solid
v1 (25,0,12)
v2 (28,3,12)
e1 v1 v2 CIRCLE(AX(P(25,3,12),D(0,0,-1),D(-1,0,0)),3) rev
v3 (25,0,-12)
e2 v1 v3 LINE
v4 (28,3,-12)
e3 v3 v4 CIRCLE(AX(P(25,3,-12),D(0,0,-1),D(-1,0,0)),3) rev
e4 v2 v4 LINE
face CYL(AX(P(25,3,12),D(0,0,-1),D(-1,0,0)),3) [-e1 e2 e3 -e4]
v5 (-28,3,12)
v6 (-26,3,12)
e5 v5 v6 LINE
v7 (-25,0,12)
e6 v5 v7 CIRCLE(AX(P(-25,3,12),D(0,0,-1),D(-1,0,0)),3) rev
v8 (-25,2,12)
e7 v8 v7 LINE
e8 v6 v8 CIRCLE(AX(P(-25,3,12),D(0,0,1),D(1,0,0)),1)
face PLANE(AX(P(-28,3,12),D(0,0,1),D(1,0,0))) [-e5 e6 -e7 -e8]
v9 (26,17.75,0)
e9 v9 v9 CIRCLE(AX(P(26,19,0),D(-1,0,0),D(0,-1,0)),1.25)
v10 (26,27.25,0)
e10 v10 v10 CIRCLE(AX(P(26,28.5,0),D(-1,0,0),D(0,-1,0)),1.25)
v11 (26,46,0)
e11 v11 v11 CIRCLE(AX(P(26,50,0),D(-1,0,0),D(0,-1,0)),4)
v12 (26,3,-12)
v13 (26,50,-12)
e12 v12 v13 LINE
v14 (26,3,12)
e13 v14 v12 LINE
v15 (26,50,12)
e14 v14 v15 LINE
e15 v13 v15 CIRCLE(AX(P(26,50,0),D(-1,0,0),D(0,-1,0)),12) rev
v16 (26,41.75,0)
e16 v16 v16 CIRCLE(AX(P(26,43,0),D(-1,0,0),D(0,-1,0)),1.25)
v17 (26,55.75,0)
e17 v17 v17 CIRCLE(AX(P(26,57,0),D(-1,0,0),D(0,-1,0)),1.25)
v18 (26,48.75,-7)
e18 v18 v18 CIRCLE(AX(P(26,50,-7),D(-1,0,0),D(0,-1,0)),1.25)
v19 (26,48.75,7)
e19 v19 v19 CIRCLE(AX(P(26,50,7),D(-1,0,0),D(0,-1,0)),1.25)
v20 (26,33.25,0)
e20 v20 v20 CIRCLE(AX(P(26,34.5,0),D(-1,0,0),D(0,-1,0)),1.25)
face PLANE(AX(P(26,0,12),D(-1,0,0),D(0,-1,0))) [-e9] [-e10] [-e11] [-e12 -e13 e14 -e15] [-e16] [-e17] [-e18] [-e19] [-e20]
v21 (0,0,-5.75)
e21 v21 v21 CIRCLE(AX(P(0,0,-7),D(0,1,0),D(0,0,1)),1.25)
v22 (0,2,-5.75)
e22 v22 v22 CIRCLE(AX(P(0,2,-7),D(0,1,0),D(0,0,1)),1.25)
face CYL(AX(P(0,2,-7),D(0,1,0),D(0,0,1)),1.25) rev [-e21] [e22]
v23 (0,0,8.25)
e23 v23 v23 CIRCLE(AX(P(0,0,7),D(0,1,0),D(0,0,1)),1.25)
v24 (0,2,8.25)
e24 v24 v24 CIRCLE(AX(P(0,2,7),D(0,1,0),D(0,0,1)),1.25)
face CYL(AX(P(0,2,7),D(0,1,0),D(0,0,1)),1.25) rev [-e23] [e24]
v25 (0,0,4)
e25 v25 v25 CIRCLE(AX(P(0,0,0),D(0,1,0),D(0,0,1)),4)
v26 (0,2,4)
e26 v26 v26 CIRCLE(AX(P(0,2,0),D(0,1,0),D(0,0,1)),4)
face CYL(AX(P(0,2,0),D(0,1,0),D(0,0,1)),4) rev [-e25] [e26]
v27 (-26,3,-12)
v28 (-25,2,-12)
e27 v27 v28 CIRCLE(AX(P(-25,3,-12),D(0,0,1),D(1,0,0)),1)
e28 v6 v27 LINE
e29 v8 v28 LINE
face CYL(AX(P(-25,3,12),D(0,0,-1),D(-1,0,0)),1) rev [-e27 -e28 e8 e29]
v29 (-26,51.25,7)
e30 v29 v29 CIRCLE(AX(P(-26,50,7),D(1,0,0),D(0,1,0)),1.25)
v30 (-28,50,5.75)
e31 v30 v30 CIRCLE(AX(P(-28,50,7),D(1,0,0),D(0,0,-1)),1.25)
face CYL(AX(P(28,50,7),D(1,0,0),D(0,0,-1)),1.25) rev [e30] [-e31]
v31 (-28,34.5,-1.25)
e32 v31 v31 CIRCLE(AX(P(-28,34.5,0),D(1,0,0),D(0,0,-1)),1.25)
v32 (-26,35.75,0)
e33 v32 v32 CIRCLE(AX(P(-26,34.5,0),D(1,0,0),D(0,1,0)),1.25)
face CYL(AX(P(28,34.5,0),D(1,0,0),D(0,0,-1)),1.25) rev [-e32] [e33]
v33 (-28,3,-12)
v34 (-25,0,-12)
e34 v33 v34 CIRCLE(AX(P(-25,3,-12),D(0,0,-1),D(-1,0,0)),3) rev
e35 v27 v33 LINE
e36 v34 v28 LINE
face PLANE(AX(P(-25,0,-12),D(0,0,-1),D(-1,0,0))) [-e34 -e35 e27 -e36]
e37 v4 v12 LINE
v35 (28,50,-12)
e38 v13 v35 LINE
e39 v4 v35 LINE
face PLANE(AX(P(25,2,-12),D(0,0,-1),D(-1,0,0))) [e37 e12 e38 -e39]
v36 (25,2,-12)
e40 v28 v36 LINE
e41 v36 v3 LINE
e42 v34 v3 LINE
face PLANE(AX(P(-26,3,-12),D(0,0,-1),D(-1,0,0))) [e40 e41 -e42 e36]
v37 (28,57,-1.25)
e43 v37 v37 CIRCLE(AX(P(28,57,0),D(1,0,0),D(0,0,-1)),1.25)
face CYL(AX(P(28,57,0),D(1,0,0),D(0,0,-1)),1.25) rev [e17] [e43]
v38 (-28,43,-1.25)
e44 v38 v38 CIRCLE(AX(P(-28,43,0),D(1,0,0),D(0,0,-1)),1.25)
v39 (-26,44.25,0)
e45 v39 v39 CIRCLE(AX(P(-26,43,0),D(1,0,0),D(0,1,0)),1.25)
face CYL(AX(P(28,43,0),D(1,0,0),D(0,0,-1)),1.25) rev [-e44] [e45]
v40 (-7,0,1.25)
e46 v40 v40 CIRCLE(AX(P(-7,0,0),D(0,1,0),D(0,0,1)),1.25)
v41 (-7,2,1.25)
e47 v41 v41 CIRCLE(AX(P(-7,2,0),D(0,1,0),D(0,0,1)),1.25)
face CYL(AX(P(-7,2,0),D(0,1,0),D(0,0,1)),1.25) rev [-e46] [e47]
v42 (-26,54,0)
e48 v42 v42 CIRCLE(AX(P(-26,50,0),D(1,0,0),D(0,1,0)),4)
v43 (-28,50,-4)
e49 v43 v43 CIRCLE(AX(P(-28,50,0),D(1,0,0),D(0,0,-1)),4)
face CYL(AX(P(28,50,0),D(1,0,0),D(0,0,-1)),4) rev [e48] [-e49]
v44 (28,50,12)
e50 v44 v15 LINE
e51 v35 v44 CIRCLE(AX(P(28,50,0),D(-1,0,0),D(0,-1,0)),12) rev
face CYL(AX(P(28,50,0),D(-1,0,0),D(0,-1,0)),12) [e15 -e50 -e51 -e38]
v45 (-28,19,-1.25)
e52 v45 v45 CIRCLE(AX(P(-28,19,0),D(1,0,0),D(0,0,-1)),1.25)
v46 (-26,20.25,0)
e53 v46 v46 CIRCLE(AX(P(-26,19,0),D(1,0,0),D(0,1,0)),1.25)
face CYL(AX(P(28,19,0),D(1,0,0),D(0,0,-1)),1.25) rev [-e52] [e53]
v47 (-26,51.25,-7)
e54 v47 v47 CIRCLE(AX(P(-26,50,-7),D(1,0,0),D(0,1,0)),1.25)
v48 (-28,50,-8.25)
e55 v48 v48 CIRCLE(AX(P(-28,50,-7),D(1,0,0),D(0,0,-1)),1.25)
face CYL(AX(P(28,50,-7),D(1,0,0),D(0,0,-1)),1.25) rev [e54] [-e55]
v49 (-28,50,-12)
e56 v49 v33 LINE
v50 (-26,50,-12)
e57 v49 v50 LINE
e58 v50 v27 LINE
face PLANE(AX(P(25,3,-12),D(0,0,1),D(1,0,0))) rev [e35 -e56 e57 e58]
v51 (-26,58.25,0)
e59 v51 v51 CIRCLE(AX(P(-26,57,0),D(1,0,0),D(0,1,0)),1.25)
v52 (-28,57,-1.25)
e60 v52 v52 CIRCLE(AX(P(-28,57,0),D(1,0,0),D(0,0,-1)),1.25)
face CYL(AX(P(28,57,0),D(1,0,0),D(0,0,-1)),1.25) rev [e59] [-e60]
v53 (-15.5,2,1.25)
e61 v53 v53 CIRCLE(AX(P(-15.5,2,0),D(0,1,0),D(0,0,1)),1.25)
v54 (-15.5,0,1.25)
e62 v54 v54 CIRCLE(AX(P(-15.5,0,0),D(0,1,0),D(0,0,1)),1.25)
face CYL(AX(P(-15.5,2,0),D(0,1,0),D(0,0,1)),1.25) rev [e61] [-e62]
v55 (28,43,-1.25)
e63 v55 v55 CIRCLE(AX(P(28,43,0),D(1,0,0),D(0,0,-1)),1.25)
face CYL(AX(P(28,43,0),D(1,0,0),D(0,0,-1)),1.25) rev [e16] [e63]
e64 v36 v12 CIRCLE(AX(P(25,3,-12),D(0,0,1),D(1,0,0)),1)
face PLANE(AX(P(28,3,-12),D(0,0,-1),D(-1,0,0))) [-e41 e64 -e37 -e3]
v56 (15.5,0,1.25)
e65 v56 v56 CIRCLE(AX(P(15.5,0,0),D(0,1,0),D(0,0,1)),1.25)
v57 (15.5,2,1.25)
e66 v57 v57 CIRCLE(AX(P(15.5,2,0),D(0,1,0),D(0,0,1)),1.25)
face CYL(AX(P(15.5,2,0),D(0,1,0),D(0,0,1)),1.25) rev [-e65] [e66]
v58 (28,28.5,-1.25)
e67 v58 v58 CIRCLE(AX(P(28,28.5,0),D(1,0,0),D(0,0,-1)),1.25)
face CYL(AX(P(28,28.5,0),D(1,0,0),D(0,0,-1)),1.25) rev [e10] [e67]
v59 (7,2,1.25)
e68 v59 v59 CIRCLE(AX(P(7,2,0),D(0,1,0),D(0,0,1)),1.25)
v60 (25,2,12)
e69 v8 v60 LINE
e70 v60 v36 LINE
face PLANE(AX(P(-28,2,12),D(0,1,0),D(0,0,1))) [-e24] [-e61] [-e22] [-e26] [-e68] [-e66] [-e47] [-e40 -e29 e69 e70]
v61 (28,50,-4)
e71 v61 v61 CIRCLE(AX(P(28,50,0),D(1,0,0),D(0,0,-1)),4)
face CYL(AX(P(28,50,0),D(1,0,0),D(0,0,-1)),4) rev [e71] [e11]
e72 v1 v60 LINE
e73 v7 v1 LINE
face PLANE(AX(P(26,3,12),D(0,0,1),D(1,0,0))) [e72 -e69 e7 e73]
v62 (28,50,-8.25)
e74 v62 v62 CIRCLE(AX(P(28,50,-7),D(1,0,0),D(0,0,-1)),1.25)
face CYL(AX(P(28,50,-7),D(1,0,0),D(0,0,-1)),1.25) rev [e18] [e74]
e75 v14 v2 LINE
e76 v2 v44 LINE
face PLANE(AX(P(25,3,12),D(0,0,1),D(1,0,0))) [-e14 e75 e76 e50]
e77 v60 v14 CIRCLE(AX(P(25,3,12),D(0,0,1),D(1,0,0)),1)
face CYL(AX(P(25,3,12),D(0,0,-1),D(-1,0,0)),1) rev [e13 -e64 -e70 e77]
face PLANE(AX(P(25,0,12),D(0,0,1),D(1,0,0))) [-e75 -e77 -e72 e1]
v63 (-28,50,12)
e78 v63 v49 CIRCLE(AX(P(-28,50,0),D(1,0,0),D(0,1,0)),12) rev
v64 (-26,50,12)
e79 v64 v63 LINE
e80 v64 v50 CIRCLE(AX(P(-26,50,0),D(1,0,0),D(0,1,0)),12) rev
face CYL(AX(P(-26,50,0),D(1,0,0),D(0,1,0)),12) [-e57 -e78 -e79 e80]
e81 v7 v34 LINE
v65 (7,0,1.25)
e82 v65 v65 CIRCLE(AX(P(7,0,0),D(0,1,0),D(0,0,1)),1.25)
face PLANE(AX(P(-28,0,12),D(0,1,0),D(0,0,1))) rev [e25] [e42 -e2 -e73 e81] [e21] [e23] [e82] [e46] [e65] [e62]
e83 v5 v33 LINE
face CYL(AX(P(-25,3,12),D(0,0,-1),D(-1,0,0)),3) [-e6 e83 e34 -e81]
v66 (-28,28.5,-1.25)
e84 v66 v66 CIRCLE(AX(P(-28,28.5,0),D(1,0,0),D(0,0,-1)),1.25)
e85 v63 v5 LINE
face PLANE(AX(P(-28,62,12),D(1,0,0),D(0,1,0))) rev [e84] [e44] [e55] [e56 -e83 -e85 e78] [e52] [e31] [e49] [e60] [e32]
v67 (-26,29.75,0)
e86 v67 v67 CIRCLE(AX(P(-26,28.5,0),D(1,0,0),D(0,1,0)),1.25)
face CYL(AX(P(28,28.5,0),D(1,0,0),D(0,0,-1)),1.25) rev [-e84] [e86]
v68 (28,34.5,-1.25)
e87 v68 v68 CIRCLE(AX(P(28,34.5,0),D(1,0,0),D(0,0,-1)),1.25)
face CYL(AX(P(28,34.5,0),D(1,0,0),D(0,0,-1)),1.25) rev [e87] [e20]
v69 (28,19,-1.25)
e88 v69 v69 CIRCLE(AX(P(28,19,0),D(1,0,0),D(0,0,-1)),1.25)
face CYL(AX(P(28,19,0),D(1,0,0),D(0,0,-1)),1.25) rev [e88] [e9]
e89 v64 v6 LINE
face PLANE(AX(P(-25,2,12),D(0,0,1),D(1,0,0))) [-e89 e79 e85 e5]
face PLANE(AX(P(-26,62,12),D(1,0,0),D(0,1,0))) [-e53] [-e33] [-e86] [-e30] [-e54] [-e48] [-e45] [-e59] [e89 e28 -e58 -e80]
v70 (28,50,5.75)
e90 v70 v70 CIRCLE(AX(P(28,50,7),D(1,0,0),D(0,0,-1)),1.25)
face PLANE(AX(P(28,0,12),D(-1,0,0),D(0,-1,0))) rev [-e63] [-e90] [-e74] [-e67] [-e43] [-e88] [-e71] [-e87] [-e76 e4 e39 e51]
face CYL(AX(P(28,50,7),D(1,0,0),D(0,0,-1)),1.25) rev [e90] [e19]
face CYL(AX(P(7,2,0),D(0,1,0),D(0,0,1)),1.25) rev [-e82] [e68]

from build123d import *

# Parameters (mm, degrees)
T_LE_DE_BASE_PLI_E1_DEPTH       = 12
ENL_V_START                     = -56
ENL_V_MAT_EXTRU_1_DEPTH         = 56
DIAM_TRE_DU_PER_AGE_8_0_8_1_D   = 8
DIAM_TRE_DU_PER_AGE_2_5_2_5_1_D = 2.5
DIAM_TRE_DU_PER_AGE_8_0_8_2_D   = 8
DIAM_TRE_DU_PER_AGE_2_5_2_5_2_D = 2.5


# Read off the part's stored shape, not the designer's step: Enlèv. mat.-Extru.1
# Sheet-metal steps are written as plain solids
with BuildPart() as part:
    # Esquisse1 → Tôle de base pliée1 (new, symmetric)
    with BuildSketch(Plane.XY):
        with BuildLine():
            Line((-28, 62), (-28, 3))
            ThreePointArc((-28, 3), (-27.121320344, 0.878679656), (-25, 0))
            Line((-25, 0), (25, 0))
            ThreePointArc((25, 0), (27.121320344, 0.878679656), (28, 3))
            Line((28, 3), (28, 62))
            Line((28, 62), (26, 62))
            Line((26, 62), (26, 3))
            ThreePointArc((26, 3), (25.707106781, 2.292893219), (25, 2))
            Line((25, 2), (-25, 2))
            ThreePointArc((-25, 2), (-25.707106781, 2.292893219), (-26, 3))
            Line((-26, 3), (-26, 62))
            Line((-26, 62), (-28, 62))
        make_face()
    extrude(amount=T_LE_DE_BASE_PLI_E1_DEPTH, both=True)

    # Enlèv. mat.-Extru.1 outline → Enlèv. mat.-Extru.1 (cut)
    with BuildSketch(Plane(origin=(28, 0, 0), x_dir=(0, 0, -1), z_dir=(1, 0, 0)).offset(ENL_V_START)):
        with BuildLine():
            ThreePointArc((-12, 50), (-8.485281374, 58.485281374), (0, 62))
            Line((0, 62), (-12, 62))
            Line((-12, 62), (-12, 50))
        make_face()
        with BuildLine():
            ThreePointArc((0, 62), (8.485281374, 58.485281374), (12, 50))
            Line((12, 50), (12, 62))
            Line((12, 62), (0, 62))
        make_face()
    extrude(amount=ENL_V_MAT_EXTRU_1_DEPTH, mode=Mode.SUBTRACT)

    # Diamètre du perçage Ø8.0 (8)1 (through all)
    with Locations(Plane(origin=(28, 0, 0), x_dir=(0, 0, -1), z_dir=(1, 0, 0))):
        with Locations((0, 50)):
            Hole(DIAM_TRE_DU_PER_AGE_8_0_8_1_D / 2)

    # Diamètre du perçage Ø2.5 (2.5)1 (through all)
    with Locations(Plane(origin=(28, 0, 0), x_dir=(0, 0, -1), z_dir=(1, 0, 0))):
        with Locations((0, 57), (7, 50), (0, 43), (-7, 50), (0, 34.5), (0, 28.5), (0, 19)):
            Hole(DIAM_TRE_DU_PER_AGE_2_5_2_5_1_D / 2)

    # Diamètre du perçage Ø8.0 (8)2 (through all)
    with Locations(Plane(origin=(0, 2, 0), x_dir=(1, 0, 0), z_dir=(0, 1, 0))):
        with Locations((0, 0)):
            Hole(DIAM_TRE_DU_PER_AGE_8_0_8_2_D / 2)

    # Diamètre du perçage Ø2.5 (2.5)2 (through all)
    with Locations(Plane(origin=(0, 2, 0), x_dir=(1, 0, 0), z_dir=(0, 1, 0))):
        with Locations((0, 7), (7, 0), (0, -7), (-7, 0), (-15.5, 0), (15.5, 0)):
            Hole(DIAM_TRE_DU_PER_AGE_2_5_2_5_2_D / 2)


solid = part.part
